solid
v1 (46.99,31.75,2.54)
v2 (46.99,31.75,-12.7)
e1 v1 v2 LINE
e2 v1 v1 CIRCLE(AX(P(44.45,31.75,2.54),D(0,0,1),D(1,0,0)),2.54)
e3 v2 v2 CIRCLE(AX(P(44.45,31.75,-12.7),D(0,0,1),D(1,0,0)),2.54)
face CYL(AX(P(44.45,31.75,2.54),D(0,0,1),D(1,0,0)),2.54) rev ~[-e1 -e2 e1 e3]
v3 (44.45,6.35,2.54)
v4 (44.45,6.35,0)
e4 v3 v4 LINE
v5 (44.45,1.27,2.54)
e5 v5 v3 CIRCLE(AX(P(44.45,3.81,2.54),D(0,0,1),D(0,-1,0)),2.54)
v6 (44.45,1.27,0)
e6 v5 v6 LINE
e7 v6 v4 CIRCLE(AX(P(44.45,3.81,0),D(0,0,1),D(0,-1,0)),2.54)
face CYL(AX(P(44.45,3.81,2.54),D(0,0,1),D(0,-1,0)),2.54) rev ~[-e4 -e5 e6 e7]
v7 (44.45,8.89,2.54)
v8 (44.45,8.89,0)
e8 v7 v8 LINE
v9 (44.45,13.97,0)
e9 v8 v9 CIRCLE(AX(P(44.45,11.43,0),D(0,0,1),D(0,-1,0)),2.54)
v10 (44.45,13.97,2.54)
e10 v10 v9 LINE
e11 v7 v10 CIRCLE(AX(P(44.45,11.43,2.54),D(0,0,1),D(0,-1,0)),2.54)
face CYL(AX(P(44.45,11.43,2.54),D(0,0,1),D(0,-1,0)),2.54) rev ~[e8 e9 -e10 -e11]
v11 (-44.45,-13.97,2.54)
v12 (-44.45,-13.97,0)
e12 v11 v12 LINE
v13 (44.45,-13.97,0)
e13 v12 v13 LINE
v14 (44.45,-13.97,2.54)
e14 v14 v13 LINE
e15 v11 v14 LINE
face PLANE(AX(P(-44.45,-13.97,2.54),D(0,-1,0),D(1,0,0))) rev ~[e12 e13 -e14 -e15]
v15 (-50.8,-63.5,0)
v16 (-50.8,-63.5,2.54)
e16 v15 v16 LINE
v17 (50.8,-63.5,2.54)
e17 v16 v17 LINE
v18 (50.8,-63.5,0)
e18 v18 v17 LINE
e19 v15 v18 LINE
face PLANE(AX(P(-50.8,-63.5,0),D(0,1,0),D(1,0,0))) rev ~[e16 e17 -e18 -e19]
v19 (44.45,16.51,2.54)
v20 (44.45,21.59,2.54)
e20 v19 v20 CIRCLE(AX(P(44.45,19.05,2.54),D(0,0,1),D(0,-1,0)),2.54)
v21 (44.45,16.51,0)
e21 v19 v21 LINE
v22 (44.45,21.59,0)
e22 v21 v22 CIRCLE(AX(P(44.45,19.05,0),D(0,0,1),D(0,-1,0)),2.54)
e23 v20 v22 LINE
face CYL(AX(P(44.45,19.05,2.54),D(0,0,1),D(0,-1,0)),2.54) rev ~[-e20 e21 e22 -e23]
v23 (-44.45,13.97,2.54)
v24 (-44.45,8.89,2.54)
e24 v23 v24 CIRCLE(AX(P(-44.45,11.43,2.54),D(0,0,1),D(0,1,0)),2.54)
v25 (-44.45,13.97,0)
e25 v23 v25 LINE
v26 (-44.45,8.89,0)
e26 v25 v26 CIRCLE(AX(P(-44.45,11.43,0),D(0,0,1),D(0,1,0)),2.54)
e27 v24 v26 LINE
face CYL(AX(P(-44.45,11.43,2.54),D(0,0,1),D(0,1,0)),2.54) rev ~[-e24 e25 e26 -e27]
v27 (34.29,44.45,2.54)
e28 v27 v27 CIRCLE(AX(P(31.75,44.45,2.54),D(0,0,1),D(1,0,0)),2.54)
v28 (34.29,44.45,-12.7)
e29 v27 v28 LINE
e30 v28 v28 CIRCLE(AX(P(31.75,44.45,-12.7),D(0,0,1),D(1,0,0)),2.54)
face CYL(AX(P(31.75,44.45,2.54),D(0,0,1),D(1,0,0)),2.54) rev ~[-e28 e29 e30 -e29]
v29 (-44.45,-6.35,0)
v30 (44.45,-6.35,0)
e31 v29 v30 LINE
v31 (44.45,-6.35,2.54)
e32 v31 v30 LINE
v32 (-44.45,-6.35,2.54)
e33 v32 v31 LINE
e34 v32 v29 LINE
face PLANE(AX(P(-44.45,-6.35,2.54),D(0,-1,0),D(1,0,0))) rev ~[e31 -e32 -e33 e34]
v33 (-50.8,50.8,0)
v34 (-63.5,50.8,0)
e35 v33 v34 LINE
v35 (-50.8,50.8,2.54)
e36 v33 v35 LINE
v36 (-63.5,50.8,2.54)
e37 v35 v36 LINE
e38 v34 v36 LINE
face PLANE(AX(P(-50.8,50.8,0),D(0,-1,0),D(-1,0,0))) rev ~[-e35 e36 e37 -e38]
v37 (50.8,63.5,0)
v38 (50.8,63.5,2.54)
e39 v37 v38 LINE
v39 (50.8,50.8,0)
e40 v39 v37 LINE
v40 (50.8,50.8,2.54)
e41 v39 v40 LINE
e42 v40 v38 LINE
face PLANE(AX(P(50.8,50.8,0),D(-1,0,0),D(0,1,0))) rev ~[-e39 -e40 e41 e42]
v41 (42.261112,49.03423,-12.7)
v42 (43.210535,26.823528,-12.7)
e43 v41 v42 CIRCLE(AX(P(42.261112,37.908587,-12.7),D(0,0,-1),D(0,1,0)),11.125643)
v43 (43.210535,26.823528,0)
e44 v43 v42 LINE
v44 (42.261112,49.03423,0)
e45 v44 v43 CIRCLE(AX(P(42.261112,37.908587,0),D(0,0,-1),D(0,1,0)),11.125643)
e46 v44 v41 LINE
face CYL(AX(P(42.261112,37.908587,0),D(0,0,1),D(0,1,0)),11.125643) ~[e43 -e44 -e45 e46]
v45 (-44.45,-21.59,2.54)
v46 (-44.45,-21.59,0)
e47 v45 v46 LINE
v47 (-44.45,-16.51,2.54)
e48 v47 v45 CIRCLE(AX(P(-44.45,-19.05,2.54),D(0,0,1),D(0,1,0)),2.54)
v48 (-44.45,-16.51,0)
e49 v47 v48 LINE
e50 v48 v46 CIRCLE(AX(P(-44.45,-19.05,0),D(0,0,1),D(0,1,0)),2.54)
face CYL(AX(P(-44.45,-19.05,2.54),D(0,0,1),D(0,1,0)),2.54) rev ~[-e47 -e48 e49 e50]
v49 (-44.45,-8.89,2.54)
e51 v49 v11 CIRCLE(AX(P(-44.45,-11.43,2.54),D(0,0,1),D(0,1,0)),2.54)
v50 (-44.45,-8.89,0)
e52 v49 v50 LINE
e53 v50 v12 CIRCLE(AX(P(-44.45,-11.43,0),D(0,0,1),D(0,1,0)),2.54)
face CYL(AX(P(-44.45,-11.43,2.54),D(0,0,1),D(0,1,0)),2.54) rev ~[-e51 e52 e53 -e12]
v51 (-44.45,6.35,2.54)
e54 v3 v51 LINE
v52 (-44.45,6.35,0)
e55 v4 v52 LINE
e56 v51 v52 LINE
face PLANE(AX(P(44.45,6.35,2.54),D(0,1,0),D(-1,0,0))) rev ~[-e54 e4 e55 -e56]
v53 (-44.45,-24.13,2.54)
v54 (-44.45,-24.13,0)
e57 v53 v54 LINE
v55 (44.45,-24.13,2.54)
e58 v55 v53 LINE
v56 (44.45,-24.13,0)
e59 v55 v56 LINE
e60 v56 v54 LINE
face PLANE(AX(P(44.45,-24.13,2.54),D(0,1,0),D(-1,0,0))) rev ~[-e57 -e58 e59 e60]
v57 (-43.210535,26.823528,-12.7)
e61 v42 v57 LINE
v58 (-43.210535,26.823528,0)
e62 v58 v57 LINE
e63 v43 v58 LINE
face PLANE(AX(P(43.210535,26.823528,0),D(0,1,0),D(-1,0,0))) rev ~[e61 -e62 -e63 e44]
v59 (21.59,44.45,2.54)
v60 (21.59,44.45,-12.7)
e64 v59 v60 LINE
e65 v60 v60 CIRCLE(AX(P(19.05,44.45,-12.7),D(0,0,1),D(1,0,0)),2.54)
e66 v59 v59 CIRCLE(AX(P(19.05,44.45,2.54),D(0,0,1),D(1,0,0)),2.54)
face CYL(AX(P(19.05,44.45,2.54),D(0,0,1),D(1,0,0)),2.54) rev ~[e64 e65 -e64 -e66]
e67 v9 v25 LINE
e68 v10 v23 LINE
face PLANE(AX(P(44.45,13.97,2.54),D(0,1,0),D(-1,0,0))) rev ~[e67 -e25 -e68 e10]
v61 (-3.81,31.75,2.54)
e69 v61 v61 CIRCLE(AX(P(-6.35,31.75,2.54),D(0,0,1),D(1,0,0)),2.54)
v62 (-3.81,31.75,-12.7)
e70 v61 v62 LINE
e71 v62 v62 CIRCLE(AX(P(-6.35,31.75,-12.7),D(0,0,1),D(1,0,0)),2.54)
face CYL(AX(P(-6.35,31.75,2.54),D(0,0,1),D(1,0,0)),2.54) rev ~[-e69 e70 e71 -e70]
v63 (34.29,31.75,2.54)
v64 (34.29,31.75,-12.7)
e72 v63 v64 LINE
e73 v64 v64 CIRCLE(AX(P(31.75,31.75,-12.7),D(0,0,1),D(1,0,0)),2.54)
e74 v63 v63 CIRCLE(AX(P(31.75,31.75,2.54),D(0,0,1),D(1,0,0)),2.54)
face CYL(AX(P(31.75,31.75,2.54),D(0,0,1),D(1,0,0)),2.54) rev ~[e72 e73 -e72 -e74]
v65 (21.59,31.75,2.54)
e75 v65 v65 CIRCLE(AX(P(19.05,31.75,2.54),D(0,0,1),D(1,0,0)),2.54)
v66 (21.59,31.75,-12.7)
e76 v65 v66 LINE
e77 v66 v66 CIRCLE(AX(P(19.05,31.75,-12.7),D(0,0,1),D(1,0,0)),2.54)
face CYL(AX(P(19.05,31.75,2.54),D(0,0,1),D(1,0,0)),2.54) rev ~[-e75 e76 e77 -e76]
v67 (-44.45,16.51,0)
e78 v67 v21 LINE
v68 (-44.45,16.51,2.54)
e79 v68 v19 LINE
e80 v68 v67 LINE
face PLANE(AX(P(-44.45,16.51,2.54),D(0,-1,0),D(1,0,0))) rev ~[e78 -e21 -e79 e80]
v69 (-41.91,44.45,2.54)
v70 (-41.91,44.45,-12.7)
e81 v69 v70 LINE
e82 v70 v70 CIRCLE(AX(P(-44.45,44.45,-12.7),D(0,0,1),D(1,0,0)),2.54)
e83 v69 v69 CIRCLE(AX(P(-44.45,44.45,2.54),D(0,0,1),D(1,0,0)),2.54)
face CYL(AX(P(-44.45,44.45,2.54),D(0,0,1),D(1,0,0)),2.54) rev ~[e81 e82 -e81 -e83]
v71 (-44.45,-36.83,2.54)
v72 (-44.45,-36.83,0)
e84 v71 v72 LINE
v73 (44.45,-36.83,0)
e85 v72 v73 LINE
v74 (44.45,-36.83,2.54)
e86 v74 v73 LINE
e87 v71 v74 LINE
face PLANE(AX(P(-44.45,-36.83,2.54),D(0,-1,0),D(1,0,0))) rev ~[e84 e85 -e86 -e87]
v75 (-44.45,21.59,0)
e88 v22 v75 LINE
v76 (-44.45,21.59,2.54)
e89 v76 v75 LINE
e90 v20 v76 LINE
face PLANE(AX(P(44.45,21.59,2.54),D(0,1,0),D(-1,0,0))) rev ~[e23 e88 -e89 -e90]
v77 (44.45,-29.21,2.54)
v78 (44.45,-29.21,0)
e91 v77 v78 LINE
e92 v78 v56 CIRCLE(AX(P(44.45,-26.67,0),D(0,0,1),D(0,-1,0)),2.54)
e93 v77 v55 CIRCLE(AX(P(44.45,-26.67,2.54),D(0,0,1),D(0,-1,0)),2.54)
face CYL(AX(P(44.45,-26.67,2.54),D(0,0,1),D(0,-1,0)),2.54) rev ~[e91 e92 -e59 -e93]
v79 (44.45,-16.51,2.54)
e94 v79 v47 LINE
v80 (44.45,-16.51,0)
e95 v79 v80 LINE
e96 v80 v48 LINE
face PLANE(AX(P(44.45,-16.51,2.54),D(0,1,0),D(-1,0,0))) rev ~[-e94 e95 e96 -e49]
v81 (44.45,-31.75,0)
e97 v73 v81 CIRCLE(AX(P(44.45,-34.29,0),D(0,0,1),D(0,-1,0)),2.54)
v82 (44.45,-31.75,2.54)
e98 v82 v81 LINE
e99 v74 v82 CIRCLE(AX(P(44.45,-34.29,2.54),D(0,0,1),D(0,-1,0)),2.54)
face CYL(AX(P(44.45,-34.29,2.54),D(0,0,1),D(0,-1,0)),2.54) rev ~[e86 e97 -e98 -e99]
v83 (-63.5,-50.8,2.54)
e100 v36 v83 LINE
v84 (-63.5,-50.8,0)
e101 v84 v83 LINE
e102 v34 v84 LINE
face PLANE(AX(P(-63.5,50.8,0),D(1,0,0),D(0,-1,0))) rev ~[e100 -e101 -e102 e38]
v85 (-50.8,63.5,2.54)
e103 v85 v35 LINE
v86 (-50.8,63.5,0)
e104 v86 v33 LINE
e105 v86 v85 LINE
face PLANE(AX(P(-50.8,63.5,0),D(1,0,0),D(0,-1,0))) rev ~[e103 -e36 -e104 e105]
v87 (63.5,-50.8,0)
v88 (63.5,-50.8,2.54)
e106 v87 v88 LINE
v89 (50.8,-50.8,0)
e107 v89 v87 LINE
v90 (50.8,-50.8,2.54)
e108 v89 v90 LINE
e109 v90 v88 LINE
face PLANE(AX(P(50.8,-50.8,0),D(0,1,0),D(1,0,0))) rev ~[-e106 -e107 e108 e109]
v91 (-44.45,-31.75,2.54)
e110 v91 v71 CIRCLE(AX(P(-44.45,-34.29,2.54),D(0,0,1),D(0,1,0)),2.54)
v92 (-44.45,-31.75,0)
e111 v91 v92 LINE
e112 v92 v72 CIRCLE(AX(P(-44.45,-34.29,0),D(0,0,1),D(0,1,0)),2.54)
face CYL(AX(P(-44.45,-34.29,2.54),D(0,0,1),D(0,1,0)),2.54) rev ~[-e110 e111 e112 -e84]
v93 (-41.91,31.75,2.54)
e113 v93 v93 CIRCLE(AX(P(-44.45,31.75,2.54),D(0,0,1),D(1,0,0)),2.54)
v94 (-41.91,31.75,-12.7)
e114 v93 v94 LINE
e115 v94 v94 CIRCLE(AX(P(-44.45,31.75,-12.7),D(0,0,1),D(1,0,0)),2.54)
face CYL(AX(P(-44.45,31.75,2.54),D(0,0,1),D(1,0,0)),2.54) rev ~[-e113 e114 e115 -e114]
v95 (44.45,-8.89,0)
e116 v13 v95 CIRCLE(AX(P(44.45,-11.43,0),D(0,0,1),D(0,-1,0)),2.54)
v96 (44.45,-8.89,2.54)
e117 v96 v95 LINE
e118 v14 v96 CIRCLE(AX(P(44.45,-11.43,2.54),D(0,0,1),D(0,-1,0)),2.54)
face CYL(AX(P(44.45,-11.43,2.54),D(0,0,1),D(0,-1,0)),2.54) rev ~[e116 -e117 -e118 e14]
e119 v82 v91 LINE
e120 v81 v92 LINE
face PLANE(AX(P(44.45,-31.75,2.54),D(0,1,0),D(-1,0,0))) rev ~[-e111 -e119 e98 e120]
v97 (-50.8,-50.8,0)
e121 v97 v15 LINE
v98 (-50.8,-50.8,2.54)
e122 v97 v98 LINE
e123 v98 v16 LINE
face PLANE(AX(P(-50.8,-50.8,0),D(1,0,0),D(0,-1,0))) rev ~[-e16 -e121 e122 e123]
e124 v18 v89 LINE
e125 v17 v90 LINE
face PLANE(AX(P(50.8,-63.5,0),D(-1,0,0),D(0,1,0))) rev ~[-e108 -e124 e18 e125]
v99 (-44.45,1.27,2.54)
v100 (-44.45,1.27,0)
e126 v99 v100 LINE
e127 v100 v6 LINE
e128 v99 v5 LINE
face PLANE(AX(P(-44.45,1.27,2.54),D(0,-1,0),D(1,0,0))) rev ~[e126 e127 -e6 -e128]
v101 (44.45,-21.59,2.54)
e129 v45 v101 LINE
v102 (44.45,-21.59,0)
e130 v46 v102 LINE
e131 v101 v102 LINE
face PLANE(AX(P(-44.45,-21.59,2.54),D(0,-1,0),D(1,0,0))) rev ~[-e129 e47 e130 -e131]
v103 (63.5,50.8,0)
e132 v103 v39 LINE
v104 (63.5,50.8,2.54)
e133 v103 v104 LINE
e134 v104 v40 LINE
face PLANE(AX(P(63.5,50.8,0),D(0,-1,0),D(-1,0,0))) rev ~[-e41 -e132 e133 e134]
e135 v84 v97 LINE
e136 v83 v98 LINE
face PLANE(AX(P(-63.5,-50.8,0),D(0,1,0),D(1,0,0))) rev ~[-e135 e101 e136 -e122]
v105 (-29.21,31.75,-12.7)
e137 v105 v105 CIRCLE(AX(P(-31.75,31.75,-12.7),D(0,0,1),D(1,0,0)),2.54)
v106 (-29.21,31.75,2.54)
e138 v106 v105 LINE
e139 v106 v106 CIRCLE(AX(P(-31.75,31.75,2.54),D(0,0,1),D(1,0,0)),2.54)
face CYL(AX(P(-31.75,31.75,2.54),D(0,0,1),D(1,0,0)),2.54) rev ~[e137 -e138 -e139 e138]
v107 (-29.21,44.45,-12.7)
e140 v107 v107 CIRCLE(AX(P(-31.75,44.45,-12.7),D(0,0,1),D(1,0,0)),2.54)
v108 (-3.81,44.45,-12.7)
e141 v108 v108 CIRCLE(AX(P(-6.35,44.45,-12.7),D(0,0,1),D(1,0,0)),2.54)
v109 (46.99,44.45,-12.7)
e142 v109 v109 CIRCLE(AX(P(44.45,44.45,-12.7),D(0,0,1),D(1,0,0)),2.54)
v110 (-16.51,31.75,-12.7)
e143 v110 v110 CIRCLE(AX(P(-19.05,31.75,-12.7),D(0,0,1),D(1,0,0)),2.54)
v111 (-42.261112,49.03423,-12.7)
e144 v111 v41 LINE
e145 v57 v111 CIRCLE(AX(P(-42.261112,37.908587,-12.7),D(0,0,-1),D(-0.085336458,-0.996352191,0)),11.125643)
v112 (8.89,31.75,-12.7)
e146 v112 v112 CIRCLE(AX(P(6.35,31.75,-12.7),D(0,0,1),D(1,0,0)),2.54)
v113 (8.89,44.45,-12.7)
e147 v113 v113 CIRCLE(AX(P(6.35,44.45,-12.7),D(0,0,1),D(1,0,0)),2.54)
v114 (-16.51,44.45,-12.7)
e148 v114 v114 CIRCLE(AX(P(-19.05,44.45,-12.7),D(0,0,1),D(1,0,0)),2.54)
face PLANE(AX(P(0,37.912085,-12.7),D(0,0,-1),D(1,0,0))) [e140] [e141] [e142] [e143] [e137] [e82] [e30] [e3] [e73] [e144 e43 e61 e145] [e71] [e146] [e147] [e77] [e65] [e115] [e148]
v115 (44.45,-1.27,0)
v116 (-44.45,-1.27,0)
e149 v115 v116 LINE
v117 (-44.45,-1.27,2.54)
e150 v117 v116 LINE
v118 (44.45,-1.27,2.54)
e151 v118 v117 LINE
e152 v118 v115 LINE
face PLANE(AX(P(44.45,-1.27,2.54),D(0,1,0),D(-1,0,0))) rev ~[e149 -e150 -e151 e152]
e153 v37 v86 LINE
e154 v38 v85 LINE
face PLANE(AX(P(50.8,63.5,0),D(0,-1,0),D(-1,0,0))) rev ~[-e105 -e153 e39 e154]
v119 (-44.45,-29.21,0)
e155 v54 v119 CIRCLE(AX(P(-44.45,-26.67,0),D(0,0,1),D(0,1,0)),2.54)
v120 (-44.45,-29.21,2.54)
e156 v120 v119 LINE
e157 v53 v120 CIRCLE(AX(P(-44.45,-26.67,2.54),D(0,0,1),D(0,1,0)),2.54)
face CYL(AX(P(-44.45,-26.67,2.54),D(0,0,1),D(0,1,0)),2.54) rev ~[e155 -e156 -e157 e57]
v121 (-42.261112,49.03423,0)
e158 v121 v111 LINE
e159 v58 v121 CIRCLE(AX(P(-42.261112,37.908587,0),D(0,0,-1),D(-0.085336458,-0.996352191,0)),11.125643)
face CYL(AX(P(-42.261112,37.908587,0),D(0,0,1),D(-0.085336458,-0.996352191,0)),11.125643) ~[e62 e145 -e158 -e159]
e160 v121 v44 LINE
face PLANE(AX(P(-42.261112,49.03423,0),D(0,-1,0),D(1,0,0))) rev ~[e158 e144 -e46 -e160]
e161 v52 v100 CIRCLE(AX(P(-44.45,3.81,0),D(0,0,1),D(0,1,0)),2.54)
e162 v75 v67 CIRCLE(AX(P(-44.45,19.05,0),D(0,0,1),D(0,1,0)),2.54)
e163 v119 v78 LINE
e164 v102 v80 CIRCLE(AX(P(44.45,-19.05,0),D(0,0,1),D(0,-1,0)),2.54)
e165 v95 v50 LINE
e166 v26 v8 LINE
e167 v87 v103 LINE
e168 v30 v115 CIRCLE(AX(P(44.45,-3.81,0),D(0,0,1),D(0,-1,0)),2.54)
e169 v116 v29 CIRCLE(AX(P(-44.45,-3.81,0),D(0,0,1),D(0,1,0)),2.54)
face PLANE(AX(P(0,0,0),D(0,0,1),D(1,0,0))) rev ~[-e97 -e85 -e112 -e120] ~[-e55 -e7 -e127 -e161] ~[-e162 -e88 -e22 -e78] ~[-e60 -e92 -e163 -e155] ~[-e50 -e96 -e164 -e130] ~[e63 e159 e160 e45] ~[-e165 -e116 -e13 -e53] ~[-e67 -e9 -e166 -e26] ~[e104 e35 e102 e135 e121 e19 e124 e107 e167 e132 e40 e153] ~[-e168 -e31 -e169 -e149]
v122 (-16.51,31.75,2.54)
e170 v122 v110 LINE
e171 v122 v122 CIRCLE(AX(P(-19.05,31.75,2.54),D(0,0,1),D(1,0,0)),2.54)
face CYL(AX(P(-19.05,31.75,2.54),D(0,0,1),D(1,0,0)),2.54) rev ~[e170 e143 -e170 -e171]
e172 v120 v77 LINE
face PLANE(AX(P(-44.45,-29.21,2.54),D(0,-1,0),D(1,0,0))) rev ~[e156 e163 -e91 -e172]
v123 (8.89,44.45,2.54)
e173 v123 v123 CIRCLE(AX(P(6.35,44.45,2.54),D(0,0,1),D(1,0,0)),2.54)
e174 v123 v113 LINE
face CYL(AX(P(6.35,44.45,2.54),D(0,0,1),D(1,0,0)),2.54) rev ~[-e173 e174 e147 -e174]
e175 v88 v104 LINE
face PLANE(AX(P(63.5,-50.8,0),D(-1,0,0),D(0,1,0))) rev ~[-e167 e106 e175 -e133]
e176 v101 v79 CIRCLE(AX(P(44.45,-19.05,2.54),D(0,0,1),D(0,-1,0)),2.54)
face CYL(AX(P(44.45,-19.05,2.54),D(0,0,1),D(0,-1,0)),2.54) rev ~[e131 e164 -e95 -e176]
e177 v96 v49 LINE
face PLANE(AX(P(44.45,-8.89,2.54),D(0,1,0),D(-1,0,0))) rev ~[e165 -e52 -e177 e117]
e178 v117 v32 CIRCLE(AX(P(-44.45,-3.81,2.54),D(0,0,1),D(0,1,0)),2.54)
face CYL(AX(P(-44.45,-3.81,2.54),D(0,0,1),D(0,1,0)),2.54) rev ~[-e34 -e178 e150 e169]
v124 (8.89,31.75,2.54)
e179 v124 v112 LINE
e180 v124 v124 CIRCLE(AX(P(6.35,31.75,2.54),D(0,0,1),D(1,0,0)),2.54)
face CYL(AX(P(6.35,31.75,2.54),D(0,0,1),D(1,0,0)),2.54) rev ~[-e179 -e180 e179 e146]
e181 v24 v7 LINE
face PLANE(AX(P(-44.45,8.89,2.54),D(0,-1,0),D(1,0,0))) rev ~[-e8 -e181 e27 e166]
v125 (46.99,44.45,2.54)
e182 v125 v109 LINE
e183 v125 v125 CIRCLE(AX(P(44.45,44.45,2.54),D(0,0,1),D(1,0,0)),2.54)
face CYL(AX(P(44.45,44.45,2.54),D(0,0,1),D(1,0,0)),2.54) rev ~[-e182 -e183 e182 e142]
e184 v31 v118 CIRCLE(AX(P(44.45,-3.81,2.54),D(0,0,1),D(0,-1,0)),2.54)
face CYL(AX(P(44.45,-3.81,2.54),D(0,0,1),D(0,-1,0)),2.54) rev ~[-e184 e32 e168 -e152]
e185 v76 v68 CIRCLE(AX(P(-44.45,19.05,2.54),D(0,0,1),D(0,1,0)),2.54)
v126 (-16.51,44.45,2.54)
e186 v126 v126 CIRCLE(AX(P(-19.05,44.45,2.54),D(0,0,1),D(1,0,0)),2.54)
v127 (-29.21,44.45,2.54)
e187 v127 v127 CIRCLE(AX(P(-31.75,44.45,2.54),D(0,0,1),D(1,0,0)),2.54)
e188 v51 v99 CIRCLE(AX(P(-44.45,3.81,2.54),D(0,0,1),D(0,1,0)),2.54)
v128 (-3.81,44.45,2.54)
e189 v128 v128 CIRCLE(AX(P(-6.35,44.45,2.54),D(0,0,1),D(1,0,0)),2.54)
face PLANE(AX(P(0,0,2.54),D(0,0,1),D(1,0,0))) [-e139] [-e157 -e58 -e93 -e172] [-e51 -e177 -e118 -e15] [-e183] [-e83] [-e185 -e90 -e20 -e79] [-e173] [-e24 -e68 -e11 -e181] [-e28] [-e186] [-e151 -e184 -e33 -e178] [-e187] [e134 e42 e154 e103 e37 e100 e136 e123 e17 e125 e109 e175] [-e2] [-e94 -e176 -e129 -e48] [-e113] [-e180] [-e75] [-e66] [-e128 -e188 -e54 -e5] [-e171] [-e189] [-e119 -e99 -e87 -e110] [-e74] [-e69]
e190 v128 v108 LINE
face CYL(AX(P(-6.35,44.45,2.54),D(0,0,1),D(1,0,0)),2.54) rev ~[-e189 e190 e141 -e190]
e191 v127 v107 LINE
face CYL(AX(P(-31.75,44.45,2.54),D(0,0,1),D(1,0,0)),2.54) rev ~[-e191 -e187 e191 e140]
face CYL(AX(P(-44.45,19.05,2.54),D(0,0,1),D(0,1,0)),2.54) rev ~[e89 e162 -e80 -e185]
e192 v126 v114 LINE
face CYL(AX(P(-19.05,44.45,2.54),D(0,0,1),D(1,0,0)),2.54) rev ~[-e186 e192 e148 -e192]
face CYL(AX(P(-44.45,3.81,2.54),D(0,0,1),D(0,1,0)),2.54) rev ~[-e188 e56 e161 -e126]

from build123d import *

# Parameters (mm, degrees)
F1_DEPTH = 2.54
F3_DEPTH = 12.7
F4_R     = 2.54
F5_DEPTH = 25.4


# Not quite as in the source:
# - a feature names something its author has since deleted; it is built from what else it names


with BuildPart() as f1:
    # F0 (on Top) → F1 (new body)
    with BuildSketch(Plane.XY):
        Polygon((50.8, 63.5), (0, 63.5), (-50.8, 63.5), (-50.8, 50.8), (-63.5, 50.8), (-63.5, 0), (-63.5, -50.8), (-50.8, -50.8), (-50.8, -63.5), (0, -63.5), (50.8, -63.5), (50.8, -50.8), (63.5, -50.8), (63.5, 0), (63.5, 50.8), (50.8, 50.8), align=None)
    extrude(amount=F1_DEPTH)

    # F2 (on face) → F3 (join)
    with BuildSketch(Plane(origin=(0, 0, 0), x_dir=(1, 0, 0), z_dir=(0, 0, -1))):
        with BuildLine():
            Line((43.2105347984, -26.8235280358), (-43.2105347984, -26.8235280358))
            ThreePointArc((-43.2105347984, -26.8235280358), (-53.3766044151, -38.3837321185), (-42.2611118031, -49.0342304111))
            Line((-42.2611118031, -49.0342304111), (42.2611118031, -49.0342304111))
            ThreePointArc((42.2611118031, -49.0342304111), (53.3766044151, -38.3837321185), (43.2105347984, -26.8235280358))
        make_face()
    extrude(amount=F3_DEPTH)

    # F4 (on face) → F5 (cut)
    with BuildSketch(Plane.XY.offset(2.54)):
        with Locations((-44.45, 44.45)):
            Circle(F4_R)
        with Locations((-44.45, 31.75)):
            Circle(F4_R)
        with Locations((-31.75, 44.45)):
            Circle(F4_R)
        with Locations((-31.75, 31.75)):
            Circle(F4_R)
        with Locations((-19.05, 44.45)):
            Circle(F4_R)
        with Locations((-19.05, 31.75)):
            Circle(F4_R)
        with Locations((-6.35, 44.45)):
            Circle(F4_R)
        with Locations((-6.35, 31.75)):
            Circle(F4_R)
        with Locations((6.35, 44.45)):
            Circle(F4_R)
        with Locations((6.35, 31.75)):
            Circle(F4_R)
        with Locations((19.05, 44.45)):
            Circle(F4_R)
        with Locations((19.05, 31.75)):
            Circle(F4_R)
        with Locations((31.75, 44.45)):
            Circle(F4_R)
        with Locations((31.75, 31.75)):
            Circle(F4_R)
        with Locations((44.45, 44.45)):
            Circle(F4_R)
        with Locations((44.45, 31.75)):
            Circle(F4_R)
        with BuildLine():
            Line((44.45, 21.59), (-44.45, 21.59))
            ThreePointArc((-44.45, 21.59), (-46.99, 19.05), (-44.45, 16.51))
            Line((-44.45, 16.51), (44.45, 16.51))
            ThreePointArc((44.45, 16.51), (46.99, 19.05), (44.45, 21.59))
        make_face()
        with BuildLine():
            Line((44.45, 13.97), (-44.45, 13.97))
            ThreePointArc((-44.45, 13.97), (-46.99, 11.43), (-44.45, 8.89))
            Line((-44.45, 8.89), (44.45, 8.89))
            ThreePointArc((44.45, 8.89), (46.99, 11.43), (44.45, 13.97))
        make_face()
        with BuildLine():
            Line((44.45, 6.35), (-44.45, 6.35))
            ThreePointArc((-44.45, 6.35), (-46.99, 3.81), (-44.45, 1.27))
            Line((-44.45, 1.27), (44.45, 1.27))
            ThreePointArc((44.45, 1.27), (46.99, 3.81), (44.45, 6.35))
        make_face()
        with BuildLine():
            Line((44.45, -1.27), (-44.45, -1.27))
            ThreePointArc((-44.45, -1.27), (-46.99, -3.81), (-44.45, -6.35))
            Line((-44.45, -6.35), (44.45, -6.35))
            ThreePointArc((44.45, -6.35), (46.99, -3.81), (44.45, -1.27))
        make_face()
        with BuildLine():
            Line((44.45, -8.89), (-44.45, -8.89))
            ThreePointArc((-44.45, -8.89), (-46.99, -11.43), (-44.45, -13.97))
            Line((-44.45, -13.97), (44.45, -13.97))
            ThreePointArc((44.45, -13.97), (46.99, -11.43), (44.45, -8.89))
        make_face()
        with BuildLine():
            Line((44.45, -16.51), (-44.45, -16.51))
            ThreePointArc((-44.45, -16.51), (-46.99, -19.05), (-44.45, -21.59))
            Line((-44.45, -21.59), (44.45, -21.59))
            ThreePointArc((44.45, -21.59), (46.99, -19.05), (44.45, -16.51))
        make_face()
        with BuildLine():
            Line((44.45, -24.13), (-44.45, -24.13))
            ThreePointArc((-44.45, -24.13), (-46.99, -26.67), (-44.45, -29.21))
            Line((-44.45, -29.21), (44.45, -29.21))
            ThreePointArc((44.45, -29.21), (46.99, -26.67), (44.45, -24.13))
        make_face()
        with BuildLine():
            Line((44.45, -31.75), (-44.45, -31.75))
            ThreePointArc((-44.45, -31.75), (-46.99, -34.29), (-44.45, -36.83))
            Line((-44.45, -36.83), (44.45, -36.83))
            ThreePointArc((44.45, -36.83), (46.99, -34.29), (44.45, -31.75))
        make_face()
    extrude(amount=-F5_DEPTH, mode=Mode.SUBTRACT)


solid = f1.part
